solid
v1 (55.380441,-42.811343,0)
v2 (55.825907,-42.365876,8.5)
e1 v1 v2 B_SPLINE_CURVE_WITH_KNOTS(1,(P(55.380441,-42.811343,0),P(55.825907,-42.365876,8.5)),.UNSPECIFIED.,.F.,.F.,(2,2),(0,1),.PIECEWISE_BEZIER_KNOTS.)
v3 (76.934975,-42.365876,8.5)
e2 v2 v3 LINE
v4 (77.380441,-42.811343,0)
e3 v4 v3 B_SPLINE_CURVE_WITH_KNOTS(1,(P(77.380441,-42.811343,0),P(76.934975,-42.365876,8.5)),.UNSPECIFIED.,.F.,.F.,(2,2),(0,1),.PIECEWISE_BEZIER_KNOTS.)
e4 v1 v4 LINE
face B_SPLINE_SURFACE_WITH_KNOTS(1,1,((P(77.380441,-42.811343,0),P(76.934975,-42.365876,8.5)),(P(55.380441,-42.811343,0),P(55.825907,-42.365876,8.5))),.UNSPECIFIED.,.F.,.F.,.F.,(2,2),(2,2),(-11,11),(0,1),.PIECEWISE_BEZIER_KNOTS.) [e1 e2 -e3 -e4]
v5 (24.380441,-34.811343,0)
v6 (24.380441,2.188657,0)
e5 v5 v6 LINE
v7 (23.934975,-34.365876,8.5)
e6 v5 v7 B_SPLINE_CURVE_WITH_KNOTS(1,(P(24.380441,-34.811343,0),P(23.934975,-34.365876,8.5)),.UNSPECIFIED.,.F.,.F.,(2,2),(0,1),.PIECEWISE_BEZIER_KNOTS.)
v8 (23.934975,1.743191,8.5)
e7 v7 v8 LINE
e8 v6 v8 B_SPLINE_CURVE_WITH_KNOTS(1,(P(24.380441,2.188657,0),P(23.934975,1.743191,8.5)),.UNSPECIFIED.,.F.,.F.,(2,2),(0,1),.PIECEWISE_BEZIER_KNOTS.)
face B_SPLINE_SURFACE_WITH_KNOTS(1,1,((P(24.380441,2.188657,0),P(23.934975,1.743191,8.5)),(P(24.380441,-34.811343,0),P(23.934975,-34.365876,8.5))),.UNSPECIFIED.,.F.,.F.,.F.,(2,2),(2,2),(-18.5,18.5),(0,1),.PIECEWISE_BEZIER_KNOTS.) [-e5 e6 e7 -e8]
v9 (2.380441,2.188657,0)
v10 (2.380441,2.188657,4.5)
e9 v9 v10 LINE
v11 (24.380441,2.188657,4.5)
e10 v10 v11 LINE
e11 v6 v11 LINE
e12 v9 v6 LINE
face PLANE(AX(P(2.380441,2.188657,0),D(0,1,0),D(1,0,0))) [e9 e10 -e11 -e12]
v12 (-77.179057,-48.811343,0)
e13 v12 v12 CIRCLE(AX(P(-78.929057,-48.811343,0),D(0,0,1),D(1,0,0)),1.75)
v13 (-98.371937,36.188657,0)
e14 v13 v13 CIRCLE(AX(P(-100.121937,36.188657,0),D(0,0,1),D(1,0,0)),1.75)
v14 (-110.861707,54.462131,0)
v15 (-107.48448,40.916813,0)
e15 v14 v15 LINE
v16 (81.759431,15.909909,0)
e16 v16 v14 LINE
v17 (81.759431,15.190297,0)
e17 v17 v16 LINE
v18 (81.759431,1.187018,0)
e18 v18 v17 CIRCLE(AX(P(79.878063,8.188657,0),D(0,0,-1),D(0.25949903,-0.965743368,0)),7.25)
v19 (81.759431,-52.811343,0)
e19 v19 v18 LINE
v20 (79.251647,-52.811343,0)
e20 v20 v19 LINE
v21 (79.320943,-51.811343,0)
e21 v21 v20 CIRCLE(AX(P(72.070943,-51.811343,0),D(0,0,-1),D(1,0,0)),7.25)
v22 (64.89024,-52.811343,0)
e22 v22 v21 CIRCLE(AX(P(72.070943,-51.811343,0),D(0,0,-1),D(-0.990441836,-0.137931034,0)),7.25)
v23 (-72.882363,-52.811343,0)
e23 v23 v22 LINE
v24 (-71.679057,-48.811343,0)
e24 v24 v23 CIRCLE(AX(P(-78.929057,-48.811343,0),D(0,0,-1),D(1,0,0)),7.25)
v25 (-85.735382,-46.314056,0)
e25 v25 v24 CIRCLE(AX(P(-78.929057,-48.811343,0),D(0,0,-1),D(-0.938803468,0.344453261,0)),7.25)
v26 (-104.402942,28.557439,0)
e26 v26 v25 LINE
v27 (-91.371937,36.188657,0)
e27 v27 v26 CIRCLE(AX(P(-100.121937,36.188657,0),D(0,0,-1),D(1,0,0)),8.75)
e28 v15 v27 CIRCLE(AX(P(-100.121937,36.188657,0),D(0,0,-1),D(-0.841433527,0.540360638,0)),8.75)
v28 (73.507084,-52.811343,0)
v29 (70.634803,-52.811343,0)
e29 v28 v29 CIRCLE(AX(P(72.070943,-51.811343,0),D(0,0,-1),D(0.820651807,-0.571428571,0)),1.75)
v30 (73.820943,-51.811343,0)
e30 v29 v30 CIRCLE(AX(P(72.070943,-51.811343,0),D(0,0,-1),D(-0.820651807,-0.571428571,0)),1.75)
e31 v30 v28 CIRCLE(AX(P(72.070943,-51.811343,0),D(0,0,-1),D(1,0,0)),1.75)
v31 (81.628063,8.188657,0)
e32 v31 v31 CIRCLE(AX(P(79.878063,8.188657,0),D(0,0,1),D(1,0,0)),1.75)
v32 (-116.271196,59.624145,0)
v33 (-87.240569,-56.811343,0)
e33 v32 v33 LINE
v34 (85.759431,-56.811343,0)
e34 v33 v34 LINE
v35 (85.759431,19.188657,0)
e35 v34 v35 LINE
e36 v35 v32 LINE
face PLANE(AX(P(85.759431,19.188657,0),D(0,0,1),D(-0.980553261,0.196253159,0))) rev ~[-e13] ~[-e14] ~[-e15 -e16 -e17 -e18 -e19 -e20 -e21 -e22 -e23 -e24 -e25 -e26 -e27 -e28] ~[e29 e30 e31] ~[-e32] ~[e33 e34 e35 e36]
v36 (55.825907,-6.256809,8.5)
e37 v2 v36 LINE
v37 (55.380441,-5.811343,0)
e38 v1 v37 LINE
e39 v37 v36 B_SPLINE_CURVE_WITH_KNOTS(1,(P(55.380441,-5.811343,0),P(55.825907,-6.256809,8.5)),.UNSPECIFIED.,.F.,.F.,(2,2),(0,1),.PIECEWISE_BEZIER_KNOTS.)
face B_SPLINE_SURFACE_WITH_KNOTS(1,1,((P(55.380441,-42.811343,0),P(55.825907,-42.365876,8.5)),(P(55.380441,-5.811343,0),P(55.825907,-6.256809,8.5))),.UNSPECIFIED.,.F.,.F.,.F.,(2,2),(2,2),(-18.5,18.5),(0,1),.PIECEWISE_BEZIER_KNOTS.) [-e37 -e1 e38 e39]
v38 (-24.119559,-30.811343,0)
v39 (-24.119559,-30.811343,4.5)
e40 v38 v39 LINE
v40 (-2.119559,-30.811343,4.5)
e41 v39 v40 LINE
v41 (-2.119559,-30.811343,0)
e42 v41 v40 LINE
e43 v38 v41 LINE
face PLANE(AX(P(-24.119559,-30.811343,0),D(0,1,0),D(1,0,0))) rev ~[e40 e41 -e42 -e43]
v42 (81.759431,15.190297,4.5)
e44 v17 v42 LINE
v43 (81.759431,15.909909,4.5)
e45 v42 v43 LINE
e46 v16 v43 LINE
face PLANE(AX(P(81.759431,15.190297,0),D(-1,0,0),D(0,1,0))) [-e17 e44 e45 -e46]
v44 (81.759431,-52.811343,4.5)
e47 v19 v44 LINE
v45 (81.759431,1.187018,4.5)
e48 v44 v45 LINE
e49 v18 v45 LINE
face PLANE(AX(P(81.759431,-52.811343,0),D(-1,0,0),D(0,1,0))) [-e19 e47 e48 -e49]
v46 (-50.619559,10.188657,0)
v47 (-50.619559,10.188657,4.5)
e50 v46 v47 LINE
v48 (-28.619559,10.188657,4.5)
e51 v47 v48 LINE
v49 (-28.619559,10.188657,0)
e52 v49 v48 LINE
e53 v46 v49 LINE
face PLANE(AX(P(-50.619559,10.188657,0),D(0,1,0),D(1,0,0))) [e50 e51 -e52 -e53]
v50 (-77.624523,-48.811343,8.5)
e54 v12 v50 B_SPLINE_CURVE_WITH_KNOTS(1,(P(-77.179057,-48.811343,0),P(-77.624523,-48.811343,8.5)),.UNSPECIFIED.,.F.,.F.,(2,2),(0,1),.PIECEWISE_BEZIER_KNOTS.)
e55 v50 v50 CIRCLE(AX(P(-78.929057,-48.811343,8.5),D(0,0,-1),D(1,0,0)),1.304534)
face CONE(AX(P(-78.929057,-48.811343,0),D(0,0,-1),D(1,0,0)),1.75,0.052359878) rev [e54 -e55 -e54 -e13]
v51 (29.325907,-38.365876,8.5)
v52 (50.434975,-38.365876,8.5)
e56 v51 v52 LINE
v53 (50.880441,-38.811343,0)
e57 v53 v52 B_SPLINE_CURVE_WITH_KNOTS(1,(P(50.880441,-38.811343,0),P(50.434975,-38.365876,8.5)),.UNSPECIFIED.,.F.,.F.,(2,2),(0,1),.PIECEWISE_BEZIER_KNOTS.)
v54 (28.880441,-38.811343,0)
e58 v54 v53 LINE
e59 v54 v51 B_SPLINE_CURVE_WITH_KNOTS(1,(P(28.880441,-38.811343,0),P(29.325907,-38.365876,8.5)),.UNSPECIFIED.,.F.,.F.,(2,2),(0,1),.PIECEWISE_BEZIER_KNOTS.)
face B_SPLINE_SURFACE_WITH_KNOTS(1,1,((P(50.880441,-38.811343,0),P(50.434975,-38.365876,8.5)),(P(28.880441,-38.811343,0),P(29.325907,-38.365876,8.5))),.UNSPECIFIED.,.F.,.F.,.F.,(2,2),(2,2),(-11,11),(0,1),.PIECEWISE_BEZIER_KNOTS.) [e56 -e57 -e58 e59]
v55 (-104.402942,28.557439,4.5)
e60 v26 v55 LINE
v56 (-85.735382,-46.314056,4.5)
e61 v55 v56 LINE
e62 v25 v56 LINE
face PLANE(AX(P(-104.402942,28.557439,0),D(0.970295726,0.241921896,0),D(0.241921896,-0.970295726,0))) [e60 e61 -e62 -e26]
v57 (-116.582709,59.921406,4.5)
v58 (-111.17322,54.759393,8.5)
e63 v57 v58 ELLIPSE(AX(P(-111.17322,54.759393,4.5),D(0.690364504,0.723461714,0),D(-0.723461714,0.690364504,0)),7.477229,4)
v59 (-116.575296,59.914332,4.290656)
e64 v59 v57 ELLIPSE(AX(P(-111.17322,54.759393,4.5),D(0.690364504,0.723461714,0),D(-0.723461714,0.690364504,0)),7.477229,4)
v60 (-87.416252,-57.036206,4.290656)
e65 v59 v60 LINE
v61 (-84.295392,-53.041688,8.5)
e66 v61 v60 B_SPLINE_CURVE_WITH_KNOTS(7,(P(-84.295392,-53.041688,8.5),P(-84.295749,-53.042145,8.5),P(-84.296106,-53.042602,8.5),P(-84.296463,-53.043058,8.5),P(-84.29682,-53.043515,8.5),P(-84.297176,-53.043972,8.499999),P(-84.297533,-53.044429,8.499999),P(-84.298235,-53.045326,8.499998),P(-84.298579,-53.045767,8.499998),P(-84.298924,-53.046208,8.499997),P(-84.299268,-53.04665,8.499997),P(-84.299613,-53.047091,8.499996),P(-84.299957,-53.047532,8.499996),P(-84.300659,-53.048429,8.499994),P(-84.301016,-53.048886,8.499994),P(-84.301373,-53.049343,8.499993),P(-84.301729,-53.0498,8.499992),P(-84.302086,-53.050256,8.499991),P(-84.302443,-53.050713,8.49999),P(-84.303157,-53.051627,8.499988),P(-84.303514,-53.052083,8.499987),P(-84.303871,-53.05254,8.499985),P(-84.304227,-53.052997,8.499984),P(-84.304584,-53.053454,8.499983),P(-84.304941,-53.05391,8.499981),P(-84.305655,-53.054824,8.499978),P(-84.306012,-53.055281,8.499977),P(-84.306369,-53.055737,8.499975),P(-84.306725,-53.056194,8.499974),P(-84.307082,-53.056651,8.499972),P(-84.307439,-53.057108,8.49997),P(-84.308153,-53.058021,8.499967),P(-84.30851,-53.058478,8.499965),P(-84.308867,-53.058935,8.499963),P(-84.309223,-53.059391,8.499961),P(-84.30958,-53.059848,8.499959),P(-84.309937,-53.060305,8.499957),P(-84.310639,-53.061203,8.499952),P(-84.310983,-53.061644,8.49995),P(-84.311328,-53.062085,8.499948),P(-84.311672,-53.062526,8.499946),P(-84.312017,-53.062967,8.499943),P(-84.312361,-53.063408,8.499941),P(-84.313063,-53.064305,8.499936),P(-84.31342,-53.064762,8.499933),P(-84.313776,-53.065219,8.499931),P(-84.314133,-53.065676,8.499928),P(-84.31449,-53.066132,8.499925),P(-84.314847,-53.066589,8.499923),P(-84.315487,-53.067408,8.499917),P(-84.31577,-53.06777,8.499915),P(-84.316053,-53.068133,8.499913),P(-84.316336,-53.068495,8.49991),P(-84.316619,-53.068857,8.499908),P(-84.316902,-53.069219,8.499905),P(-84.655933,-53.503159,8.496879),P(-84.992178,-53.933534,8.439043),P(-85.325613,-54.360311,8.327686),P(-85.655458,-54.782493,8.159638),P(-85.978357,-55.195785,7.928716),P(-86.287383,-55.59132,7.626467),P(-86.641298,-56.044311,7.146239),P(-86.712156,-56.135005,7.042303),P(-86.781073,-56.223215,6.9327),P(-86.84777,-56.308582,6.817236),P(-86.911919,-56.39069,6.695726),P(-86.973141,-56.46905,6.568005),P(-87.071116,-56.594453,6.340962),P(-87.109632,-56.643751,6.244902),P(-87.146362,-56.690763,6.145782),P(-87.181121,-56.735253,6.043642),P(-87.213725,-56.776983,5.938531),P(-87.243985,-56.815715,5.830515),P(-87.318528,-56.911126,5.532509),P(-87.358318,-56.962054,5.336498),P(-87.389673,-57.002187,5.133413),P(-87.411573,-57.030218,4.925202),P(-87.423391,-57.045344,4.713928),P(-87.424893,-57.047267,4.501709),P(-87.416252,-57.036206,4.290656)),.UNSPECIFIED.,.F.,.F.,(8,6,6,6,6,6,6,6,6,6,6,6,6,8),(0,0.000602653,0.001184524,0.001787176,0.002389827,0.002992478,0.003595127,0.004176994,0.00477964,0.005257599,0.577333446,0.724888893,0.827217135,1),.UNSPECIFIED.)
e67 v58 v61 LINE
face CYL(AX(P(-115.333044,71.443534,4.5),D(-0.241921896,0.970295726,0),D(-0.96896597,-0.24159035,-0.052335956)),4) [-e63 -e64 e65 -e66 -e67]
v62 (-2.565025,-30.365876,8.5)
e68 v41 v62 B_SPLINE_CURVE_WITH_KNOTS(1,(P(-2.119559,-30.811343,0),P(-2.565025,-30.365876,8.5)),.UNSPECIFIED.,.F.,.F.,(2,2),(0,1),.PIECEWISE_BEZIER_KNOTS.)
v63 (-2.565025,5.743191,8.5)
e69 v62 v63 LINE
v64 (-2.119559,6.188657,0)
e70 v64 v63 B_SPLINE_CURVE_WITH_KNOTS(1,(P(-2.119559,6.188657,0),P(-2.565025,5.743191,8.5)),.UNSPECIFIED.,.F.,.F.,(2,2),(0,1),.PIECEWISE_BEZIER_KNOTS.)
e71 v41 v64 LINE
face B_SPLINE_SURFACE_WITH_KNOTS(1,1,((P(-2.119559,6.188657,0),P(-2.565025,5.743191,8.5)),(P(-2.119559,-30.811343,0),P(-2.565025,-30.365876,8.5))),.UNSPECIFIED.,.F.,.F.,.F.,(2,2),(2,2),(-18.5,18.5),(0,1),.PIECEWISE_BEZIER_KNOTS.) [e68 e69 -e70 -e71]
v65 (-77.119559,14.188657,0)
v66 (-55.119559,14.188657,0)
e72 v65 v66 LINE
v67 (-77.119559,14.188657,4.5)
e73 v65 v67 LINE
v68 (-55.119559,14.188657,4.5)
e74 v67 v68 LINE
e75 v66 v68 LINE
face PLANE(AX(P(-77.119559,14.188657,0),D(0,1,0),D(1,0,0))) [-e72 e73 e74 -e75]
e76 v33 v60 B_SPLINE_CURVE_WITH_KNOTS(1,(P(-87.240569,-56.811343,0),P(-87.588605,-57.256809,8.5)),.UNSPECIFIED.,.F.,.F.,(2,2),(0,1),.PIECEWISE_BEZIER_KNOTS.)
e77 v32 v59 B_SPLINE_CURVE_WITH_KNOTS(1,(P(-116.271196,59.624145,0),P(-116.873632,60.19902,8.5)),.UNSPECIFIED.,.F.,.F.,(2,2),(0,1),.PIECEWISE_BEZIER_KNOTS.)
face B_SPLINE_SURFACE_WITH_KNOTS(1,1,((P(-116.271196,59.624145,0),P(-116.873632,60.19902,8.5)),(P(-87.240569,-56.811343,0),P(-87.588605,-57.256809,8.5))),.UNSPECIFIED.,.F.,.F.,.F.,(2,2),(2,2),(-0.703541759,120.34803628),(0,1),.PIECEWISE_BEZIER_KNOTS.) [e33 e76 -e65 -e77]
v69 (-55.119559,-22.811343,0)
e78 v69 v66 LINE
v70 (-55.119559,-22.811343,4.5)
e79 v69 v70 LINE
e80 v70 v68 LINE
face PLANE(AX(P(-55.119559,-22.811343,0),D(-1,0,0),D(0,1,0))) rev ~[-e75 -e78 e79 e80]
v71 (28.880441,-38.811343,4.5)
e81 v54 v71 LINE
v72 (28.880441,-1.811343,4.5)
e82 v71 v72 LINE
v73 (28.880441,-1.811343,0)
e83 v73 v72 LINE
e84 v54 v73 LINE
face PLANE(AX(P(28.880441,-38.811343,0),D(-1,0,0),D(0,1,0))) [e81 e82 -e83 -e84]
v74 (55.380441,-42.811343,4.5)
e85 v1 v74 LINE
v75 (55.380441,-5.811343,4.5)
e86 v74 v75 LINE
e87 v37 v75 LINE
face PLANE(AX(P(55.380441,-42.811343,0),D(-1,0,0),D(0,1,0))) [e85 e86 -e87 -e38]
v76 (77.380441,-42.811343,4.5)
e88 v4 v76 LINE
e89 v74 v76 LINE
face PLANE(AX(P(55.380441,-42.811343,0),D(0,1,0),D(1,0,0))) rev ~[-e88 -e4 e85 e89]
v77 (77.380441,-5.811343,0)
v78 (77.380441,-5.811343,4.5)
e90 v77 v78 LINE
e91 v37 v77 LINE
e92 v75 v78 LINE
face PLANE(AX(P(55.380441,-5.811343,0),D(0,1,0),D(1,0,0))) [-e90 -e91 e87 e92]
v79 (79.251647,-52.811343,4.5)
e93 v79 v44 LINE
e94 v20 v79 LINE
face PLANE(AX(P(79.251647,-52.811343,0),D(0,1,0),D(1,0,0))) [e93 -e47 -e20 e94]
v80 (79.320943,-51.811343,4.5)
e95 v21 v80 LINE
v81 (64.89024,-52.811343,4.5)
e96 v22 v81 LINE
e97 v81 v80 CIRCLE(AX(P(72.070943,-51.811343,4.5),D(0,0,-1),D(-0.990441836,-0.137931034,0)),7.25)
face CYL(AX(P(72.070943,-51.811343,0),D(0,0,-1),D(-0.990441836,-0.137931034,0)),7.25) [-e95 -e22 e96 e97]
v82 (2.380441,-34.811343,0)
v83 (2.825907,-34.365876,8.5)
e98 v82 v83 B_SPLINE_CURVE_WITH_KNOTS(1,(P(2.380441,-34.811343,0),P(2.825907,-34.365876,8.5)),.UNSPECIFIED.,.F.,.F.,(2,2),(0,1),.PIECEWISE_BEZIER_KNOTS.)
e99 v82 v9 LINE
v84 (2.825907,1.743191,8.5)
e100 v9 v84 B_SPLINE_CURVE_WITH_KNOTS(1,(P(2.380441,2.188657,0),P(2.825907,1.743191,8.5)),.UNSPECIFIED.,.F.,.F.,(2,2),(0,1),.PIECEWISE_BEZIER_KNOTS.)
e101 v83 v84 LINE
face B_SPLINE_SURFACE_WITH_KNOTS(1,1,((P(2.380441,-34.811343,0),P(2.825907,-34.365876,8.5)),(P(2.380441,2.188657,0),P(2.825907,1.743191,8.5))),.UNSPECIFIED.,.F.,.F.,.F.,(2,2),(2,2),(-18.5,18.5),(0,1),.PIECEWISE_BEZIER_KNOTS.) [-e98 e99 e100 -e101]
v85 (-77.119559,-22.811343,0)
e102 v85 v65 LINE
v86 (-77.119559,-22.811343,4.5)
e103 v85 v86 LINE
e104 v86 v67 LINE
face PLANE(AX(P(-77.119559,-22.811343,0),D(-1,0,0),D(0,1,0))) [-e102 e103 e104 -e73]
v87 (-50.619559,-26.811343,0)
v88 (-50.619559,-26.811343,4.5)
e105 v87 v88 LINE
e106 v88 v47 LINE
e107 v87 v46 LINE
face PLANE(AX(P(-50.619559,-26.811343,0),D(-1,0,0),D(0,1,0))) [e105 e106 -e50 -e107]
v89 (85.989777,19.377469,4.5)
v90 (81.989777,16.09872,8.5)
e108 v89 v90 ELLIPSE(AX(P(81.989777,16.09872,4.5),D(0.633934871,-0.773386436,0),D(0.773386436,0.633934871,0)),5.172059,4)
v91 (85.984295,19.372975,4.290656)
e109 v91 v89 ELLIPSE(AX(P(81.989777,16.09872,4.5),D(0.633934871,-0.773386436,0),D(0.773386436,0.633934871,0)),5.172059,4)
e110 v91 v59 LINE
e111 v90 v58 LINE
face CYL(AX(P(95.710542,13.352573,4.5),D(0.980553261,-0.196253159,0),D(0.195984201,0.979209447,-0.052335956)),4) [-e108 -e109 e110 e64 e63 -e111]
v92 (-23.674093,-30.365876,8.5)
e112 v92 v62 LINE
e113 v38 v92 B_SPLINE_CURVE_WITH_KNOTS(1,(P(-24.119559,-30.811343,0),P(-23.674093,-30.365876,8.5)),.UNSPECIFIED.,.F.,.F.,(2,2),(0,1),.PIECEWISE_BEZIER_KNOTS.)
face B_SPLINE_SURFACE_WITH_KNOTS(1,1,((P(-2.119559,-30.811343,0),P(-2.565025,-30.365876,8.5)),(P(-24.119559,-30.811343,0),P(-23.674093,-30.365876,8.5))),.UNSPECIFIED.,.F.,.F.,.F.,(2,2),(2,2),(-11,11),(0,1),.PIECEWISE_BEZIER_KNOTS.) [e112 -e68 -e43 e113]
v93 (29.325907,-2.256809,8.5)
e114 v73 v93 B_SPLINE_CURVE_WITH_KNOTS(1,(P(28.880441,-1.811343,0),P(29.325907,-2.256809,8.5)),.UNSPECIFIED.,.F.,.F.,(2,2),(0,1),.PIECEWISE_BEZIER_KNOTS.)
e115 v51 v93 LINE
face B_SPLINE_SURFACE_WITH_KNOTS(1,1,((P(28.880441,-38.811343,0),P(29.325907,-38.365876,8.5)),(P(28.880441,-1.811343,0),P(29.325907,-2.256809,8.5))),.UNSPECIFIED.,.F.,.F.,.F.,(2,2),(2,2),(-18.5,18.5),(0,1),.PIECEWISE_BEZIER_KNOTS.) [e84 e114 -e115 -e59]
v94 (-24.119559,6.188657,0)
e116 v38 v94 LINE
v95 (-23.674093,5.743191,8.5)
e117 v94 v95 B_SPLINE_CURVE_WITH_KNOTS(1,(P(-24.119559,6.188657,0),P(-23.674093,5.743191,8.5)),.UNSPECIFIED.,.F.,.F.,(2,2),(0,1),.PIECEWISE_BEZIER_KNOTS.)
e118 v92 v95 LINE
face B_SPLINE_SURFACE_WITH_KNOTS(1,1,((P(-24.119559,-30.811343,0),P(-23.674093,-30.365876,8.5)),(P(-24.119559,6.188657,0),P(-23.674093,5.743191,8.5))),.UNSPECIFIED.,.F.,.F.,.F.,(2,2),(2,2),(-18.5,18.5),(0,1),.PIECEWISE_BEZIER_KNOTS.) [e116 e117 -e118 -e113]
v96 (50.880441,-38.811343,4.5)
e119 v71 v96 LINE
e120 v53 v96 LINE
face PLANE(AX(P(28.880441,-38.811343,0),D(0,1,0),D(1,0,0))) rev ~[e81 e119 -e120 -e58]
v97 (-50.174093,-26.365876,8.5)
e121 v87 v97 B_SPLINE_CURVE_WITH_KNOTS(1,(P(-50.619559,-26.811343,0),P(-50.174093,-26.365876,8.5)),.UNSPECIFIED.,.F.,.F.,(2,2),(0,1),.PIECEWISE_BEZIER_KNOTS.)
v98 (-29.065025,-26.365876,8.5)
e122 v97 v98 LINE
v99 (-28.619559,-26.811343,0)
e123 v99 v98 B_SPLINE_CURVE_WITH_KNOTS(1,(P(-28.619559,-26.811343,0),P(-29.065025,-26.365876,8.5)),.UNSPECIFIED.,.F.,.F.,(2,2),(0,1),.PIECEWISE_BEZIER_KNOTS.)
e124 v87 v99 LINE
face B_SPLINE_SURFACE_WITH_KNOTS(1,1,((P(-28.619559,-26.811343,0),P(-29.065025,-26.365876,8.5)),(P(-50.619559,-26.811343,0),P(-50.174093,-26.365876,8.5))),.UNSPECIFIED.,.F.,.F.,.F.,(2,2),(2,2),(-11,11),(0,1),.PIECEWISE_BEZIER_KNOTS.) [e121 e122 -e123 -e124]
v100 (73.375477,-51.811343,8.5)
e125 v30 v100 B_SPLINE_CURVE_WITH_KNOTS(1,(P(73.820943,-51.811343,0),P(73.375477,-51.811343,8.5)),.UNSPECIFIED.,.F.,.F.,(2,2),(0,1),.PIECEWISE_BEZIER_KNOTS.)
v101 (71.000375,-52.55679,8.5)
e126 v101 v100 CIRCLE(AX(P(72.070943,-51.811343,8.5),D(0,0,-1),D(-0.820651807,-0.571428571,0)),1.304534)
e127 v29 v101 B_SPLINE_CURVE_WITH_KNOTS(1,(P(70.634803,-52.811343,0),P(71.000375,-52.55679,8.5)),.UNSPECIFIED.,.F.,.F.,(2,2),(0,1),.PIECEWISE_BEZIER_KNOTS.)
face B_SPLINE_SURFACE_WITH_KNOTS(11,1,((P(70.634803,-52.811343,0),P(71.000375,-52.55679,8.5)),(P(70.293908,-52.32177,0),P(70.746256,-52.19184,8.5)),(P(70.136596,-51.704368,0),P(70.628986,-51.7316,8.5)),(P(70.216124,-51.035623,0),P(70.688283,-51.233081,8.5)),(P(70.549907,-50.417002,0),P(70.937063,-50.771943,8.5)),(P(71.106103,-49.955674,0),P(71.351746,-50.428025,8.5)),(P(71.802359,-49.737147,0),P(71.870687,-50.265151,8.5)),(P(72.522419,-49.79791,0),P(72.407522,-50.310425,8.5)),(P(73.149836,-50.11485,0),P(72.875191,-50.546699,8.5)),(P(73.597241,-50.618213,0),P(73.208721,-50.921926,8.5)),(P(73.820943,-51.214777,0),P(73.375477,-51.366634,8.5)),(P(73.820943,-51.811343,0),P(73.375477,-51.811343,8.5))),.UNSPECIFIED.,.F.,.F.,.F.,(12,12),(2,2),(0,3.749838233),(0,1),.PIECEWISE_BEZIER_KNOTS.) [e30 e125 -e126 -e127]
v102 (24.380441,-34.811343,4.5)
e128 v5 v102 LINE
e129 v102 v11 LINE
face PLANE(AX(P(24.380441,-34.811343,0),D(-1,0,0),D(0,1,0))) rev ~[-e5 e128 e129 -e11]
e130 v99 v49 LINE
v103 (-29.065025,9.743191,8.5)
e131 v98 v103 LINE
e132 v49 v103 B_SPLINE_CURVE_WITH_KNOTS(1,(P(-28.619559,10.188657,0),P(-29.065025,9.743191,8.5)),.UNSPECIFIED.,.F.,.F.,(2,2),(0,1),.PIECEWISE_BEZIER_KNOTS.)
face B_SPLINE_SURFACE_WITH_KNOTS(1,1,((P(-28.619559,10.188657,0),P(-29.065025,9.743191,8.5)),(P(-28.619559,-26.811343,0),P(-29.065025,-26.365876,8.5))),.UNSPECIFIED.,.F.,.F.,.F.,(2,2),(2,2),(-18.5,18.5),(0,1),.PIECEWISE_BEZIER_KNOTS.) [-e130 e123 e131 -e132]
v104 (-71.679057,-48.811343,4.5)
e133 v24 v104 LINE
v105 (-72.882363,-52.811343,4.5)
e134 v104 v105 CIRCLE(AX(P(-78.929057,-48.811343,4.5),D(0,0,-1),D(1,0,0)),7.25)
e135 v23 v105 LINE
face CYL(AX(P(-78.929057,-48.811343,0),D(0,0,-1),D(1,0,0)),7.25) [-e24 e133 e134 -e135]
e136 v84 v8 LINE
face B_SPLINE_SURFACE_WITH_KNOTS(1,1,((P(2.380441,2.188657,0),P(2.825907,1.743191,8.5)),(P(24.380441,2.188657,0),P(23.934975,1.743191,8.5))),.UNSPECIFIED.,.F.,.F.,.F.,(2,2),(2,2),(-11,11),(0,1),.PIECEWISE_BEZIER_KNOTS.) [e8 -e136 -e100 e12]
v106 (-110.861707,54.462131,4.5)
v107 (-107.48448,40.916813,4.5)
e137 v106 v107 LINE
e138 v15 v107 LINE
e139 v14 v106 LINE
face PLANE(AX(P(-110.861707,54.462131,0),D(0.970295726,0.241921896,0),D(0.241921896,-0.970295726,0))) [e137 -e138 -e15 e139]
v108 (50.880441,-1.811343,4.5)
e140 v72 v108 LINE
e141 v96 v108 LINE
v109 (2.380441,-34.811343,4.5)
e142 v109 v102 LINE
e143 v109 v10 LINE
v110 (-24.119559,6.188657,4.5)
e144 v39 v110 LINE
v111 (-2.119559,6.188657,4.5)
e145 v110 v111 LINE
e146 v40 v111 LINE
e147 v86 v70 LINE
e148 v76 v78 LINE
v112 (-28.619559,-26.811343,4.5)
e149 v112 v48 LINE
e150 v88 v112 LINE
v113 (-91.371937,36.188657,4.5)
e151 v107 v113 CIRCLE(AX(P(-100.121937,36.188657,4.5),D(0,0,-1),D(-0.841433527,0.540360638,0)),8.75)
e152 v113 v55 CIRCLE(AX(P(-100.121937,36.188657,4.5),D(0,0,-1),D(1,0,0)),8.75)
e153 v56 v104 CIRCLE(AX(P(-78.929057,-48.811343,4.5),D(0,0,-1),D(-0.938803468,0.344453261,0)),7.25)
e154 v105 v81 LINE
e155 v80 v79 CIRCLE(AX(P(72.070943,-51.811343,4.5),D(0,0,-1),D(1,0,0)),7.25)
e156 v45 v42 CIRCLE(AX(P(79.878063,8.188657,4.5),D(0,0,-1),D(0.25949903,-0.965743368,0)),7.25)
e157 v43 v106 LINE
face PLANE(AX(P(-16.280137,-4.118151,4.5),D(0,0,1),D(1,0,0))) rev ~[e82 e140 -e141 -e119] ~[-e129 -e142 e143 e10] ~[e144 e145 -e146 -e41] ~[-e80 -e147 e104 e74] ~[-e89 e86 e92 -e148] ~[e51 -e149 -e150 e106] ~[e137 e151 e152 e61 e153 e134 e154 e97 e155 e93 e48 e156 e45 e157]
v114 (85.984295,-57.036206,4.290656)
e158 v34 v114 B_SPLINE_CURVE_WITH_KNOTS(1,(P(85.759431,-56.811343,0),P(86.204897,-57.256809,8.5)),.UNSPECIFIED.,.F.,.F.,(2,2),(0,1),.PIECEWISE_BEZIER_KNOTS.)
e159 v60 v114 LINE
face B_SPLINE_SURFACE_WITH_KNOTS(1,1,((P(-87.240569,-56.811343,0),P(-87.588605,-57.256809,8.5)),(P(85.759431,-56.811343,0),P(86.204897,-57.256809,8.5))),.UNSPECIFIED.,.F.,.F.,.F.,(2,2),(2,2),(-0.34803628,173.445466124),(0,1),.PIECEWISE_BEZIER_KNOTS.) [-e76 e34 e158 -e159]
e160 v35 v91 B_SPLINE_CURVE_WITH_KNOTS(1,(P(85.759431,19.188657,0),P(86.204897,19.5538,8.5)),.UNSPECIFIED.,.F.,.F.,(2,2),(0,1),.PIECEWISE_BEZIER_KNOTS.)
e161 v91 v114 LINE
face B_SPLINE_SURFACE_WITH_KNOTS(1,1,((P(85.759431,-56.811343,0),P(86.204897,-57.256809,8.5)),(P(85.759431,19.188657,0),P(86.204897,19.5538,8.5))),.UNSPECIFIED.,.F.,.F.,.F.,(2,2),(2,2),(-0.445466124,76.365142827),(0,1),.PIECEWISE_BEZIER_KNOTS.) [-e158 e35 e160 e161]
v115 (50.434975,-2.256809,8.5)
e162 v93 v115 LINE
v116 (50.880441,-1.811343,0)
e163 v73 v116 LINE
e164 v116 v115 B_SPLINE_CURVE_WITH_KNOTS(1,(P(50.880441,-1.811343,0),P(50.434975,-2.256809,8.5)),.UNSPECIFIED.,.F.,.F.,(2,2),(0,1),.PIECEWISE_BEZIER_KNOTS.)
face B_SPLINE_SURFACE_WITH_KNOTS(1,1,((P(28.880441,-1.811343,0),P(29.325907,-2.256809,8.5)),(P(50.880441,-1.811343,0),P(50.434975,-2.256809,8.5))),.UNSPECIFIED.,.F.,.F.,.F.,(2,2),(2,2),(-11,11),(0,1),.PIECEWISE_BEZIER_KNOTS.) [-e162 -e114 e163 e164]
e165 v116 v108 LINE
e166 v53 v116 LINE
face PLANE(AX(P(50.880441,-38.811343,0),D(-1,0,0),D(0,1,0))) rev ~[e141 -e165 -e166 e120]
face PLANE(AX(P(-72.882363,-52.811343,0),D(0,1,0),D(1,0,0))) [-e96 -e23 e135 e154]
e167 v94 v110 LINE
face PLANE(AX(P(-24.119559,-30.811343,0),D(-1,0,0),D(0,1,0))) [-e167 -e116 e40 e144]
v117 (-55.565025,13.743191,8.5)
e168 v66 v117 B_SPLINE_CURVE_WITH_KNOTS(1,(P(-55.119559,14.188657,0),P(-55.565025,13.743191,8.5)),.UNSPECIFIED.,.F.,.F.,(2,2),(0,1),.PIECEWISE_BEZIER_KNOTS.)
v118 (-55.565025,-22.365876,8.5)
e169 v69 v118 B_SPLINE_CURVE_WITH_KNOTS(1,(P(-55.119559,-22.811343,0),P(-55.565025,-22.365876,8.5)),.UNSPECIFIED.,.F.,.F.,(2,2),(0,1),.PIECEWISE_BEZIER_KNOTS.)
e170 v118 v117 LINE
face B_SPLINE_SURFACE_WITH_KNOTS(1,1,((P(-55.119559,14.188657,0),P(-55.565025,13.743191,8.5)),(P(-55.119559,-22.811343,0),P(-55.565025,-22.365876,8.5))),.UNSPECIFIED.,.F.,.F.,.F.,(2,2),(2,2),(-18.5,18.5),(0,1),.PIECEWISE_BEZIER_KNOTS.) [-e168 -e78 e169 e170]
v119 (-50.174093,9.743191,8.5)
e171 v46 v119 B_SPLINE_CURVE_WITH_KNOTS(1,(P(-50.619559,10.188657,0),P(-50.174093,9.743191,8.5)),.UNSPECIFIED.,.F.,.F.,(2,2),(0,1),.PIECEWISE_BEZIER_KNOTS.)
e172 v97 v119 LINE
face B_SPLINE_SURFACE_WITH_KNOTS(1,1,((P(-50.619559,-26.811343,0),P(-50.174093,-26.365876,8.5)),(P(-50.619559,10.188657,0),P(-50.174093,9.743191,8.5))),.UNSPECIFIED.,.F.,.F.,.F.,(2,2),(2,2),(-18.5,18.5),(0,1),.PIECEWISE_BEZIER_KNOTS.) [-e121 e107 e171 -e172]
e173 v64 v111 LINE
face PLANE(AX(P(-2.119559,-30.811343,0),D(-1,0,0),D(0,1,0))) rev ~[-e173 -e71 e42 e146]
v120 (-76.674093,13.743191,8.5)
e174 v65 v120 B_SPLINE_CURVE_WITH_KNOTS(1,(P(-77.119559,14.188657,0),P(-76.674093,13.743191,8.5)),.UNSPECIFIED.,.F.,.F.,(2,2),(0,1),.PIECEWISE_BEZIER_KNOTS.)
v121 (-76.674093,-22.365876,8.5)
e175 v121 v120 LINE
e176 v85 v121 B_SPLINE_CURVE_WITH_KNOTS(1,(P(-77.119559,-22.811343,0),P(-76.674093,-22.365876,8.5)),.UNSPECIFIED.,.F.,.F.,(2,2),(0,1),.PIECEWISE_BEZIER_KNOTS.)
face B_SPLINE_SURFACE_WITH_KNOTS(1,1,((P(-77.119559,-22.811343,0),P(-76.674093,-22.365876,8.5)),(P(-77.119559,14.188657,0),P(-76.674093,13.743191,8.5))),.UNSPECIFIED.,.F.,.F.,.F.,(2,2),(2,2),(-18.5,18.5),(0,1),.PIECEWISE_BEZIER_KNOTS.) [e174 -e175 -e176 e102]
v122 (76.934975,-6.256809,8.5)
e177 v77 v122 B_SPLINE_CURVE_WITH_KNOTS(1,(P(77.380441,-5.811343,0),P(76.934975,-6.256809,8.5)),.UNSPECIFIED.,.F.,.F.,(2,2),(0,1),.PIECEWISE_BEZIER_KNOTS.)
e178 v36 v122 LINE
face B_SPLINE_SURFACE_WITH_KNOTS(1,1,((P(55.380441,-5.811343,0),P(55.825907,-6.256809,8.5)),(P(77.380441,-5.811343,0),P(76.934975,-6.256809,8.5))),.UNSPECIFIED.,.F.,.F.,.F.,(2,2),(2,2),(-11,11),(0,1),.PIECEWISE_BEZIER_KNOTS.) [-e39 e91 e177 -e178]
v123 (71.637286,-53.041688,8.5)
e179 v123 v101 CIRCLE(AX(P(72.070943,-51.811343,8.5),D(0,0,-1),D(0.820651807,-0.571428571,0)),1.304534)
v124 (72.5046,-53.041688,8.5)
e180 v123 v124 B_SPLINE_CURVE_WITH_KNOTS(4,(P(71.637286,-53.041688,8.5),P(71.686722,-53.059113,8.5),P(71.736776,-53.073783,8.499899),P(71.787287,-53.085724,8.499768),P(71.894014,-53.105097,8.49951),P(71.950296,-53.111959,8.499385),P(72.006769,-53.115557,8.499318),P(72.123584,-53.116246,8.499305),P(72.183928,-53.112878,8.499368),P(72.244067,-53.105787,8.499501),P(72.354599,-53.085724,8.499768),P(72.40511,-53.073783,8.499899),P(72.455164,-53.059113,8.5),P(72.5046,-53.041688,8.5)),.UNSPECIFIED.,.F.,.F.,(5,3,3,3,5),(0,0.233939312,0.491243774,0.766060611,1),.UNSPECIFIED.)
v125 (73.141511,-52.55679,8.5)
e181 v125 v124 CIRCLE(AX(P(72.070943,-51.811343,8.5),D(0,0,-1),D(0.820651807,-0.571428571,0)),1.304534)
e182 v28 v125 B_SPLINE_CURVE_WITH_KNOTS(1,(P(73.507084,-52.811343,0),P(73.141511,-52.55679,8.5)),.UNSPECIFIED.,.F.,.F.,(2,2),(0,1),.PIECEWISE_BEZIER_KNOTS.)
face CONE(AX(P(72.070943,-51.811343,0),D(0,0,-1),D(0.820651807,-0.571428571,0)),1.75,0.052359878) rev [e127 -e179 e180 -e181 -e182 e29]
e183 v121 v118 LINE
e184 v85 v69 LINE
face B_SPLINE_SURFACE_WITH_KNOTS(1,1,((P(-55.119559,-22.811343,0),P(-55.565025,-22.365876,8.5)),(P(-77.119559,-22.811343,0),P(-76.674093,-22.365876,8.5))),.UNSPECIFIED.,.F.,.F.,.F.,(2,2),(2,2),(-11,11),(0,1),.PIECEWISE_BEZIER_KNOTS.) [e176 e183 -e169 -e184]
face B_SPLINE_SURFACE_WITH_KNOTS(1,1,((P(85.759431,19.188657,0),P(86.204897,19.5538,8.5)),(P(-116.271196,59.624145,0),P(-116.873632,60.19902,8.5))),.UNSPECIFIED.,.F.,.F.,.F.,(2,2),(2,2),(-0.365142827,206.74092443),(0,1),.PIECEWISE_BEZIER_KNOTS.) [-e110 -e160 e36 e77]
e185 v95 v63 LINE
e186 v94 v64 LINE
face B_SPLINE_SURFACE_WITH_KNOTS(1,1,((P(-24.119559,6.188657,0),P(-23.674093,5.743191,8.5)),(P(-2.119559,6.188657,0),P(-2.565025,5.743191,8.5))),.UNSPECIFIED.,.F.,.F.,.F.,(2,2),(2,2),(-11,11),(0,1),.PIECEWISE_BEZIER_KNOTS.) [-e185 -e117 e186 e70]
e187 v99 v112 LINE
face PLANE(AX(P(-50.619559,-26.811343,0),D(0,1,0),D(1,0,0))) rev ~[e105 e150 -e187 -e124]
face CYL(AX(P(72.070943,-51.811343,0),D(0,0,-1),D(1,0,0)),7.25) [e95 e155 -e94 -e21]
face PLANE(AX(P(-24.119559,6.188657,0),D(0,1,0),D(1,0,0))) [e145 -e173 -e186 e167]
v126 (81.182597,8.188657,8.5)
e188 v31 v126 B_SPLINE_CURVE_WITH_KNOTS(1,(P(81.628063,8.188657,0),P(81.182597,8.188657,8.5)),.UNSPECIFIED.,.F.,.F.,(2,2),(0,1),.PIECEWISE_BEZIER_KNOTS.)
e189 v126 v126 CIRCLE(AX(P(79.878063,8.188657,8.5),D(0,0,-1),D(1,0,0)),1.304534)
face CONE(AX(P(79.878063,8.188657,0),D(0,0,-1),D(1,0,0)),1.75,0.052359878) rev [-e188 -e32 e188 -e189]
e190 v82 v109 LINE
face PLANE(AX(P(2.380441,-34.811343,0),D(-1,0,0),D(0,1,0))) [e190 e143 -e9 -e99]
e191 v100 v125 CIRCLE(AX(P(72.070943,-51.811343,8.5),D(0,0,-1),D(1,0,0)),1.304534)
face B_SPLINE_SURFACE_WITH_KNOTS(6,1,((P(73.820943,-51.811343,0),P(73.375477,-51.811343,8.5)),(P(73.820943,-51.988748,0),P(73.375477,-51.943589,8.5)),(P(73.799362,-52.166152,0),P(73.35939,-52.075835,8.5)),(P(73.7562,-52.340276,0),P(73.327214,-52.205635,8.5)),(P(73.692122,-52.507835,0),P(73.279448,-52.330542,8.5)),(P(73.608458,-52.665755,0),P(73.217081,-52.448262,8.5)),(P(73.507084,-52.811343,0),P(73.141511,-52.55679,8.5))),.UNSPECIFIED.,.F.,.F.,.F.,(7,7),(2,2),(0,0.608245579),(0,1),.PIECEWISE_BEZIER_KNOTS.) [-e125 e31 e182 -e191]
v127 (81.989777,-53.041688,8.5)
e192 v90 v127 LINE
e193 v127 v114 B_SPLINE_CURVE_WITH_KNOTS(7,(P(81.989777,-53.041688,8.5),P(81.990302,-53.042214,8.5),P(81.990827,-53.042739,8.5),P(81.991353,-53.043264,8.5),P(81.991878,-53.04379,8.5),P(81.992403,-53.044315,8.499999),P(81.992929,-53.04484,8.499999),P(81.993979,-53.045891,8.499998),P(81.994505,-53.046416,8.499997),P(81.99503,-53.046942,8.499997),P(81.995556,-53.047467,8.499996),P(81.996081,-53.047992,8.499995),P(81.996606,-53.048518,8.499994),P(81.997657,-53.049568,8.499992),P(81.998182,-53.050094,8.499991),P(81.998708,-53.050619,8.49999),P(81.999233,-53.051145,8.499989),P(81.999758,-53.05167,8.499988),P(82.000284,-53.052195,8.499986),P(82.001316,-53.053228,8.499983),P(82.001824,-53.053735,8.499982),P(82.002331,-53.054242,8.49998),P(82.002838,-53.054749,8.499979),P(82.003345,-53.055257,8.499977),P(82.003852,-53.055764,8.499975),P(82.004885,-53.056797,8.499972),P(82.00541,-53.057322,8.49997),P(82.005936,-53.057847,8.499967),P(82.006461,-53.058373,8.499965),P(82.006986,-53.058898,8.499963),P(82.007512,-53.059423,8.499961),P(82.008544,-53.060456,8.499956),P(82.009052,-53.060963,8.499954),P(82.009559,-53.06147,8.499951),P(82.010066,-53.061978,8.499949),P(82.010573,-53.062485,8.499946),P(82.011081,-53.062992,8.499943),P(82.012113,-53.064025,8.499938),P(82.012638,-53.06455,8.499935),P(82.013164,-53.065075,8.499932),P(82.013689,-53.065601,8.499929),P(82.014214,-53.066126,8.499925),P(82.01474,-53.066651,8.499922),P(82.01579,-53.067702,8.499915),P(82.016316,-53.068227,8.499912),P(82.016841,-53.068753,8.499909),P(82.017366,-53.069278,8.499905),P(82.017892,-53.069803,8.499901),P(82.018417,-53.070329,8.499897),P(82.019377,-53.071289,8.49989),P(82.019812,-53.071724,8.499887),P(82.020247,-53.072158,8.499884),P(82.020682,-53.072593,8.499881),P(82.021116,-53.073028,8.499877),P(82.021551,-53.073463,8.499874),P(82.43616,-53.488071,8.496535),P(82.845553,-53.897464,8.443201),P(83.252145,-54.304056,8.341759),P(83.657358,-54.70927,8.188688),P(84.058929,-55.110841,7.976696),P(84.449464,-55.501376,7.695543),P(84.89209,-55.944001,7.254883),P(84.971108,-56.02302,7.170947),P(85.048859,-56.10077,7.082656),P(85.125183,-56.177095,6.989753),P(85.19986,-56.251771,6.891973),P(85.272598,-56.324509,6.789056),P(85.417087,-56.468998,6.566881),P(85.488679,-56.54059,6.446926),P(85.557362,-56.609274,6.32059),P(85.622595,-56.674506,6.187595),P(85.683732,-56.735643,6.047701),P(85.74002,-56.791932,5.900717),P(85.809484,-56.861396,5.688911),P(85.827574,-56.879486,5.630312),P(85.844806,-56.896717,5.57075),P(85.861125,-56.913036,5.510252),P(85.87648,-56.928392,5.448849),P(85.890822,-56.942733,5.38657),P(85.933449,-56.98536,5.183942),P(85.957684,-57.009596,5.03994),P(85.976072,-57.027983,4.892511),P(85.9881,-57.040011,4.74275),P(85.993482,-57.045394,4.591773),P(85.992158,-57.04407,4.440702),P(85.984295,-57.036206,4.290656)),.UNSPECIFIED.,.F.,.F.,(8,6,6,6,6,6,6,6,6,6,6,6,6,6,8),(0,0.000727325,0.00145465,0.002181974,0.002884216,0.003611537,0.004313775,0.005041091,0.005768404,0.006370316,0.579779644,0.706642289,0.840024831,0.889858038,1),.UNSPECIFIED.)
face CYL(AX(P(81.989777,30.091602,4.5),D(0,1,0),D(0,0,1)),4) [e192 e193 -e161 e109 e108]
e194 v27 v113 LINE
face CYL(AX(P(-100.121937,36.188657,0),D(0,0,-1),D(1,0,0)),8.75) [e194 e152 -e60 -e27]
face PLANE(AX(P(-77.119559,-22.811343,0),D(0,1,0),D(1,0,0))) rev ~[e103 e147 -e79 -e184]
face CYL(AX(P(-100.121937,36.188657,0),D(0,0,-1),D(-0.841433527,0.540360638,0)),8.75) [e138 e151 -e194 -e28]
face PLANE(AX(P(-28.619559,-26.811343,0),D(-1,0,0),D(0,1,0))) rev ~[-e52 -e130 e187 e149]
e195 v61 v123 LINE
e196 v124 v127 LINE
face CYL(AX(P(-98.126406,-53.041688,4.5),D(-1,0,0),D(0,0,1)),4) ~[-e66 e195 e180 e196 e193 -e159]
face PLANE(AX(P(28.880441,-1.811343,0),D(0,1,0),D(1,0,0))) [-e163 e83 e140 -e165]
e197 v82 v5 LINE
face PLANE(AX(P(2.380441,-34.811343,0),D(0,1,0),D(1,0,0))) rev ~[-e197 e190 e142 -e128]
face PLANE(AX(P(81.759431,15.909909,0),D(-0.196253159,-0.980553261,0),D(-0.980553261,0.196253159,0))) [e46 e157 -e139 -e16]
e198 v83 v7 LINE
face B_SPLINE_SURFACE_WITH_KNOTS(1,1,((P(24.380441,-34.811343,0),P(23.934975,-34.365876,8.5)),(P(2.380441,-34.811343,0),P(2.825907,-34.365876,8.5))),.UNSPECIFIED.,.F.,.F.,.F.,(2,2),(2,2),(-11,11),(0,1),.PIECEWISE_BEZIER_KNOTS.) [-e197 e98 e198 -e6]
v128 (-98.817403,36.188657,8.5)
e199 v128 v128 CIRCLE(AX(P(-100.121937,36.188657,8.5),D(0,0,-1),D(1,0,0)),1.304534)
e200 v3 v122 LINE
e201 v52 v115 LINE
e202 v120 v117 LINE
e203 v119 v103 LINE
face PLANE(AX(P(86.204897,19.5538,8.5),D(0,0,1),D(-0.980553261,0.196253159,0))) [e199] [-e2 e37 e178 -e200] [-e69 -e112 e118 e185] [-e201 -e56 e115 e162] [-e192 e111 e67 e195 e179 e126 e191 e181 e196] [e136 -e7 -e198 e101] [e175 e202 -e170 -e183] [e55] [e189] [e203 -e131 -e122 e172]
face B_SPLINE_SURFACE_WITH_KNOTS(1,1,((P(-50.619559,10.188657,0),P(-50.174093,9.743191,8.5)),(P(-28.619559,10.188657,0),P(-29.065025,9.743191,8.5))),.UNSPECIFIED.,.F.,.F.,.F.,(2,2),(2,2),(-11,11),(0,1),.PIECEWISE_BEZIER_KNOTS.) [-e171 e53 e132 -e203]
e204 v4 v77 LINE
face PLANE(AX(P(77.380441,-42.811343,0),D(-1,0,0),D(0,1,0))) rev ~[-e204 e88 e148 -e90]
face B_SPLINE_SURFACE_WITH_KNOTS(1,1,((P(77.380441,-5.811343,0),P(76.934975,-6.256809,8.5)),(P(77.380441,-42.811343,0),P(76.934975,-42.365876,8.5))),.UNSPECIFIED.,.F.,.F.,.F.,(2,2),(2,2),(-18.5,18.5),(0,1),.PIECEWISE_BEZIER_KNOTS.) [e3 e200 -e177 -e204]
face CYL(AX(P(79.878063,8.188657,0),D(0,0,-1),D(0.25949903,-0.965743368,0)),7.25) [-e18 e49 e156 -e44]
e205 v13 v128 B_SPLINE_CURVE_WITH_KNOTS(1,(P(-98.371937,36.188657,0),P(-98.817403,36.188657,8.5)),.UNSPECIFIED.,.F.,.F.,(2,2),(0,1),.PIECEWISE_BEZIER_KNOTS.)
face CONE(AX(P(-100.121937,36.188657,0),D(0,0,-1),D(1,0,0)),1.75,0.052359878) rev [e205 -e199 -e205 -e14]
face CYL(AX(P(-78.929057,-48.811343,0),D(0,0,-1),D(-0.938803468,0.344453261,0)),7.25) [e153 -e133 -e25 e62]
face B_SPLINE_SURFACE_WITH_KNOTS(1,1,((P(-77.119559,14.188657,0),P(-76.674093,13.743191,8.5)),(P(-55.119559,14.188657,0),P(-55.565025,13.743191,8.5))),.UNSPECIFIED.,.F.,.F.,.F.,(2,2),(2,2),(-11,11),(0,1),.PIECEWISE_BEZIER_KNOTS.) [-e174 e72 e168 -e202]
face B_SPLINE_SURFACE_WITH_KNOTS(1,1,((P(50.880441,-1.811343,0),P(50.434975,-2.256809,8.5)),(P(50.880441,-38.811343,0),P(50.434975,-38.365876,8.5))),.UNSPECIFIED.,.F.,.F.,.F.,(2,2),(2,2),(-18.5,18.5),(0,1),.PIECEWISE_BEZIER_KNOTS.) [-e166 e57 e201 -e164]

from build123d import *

# Parameters (mm, degrees)
F0_R        = 1.75
F0_W        = 22
F0_H        = 37
F1_DEPTH    = 8.5
F1_TAPER    = -3
F2_DEPTH    = 4.5
F3_T1_DEPTH = 142.1271805444
F3_T3_DEPTH = 228.1816697632
F3_T5_DEPTH = 194.8691049092
F3_T7_DEPTH = 97.8862114568


# Not quite as in the source:
# - a fillet or chamfer that OpenCascade refuses, or shapes differently, is made with other operations: its cross-section is extruded or revolved along the edge and cut away or added


with BuildPart() as f1:
    # F0 (on Top) → F1 (new body)
    with BuildSketch(Plane.XY):
        with BuildLine():
            ThreePointArc((-85.7353818111, -46.3140564233), (-82.1998275149, -55.281625252), (-72.882363358, -52.811342563))
            Line((-72.882363358, -52.811342563), (-84.115426434, -52.811342563))
            Line((-84.115426434, -52.811342563), (-85.7353818111, -46.3140564233))
        make_face()
        with BuildLine():
            Line((-84.115426434, -52.811342563), (-72.882363358, -52.811342563))
            ThreePointArc((-72.882363358, -52.811342563), (-71.9863977223, -50.8998795502), (-71.6790566692, -48.811342563))
            ThreePointArc((-71.6790566692, -48.811342563), (-77.6608605642, -41.6731229923), (-85.7353818111, -46.3140564233))
            Line((-85.7353818111, -46.3140564233), (-84.115426434, -52.811342563))
        make_face()
        with Locations((-78.9290566692, -48.811342563)):
            Circle(F0_R, mode=Mode.SUBTRACT)
        with BuildLine():
            ThreePointArc((73.5070839924, -52.811342563), (72.0709433308, -53.561342563), (70.6348026691, -52.811342563))
            Line((70.6348026691, -52.811342563), (64.8902400226, -52.811342563))
            ThreePointArc((64.8902400226, -52.811342563), (65.5417323383, -54.9628348787), (66.8209433308, -56.811342563))
            Line((66.8209433308, -56.811342563), (77.3209433308, -56.811342563))
            ThreePointArc((77.3209433308, -56.811342563), (78.6001543232, -54.9628348787), (79.2516466389, -52.811342563))
            Line((79.2516466389, -52.811342563), (73.5070839924, -52.811342563))
        make_face()
        with BuildLine():
            ThreePointArc((70.6348026691, -52.811342563), (71.5468947442, -50.1416500527), (73.8209433308, -51.811342563))
            ThreePointArc((73.8209433308, -51.811342563), (73.7406358411, -52.3353911496), (73.5070839924, -52.811342563))
            Line((73.5070839924, -52.811342563), (79.2516466389, -52.811342563))
            ThreePointArc((79.2516466389, -52.811342563), (79.3035984098, -52.3125416331), (79.3209433308, -51.811342563))
            ThreePointArc((79.3209433308, -51.811342563), (71.5697442607, -44.578687484), (64.8902400226, -52.811342563))
            Line((64.8902400226, -52.811342563), (70.6348026691, -52.811342563))
        make_face()
        with BuildLine():
            ThreePointArc((81.75943106, 15.1902968563), (72.6280630891, 8.188657437), (81.75943106, 1.1870180177))
            Line((81.75943106, 1.1870180177), (81.75943106, 15.1902968563))
        make_face()
        with Locations((79.8780630891, 8.188657437)):
            Circle(F0_R, mode=Mode.SUBTRACT)
        with BuildLine():
            Line((81.75943106, 15.1902968563), (81.75943106, 1.1870180177))
            ThreePointArc((81.75943106, 1.1870180177), (83.9978435057, 2.2229295418), (85.75943106, 3.9493165931))
            Line((85.75943106, 3.9493165931), (85.75943106, 12.4279982809))
            ThreePointArc((85.75943106, 12.4279982809), (83.9978435057, 14.1543853322), (81.75943106, 15.1902968563))
        make_face()
        with BuildLine():
            Line((-107.4844802754, 40.9168130189), (-104.4029422618, 28.5574391079))
            ThreePointArc((-104.4029422618, 28.5574391079), (-95.700189339, 28.6381178265), (-91.3719369109, 36.188657437))
            ThreePointArc((-91.3719369109, 36.188657437), (-97.6581749945, 44.5846313066), (-107.4844802754, 40.9168130189))
        make_face()
        with Locations((-100.1219369109, 36.188657437)):
            Circle(F0_R, mode=Mode.SUBTRACT)
        with BuildLine():
            ThreePointArc((-107.4844802754, 40.9168130189), (-108.6120245158, 34.0718408505), (-104.4029422618, 28.5574391079))
            Line((-104.4029422618, 28.5574391079), (-107.4844802754, 40.9168130189))
        make_face()
        with BuildLine():
            ThreePointArc((66.8209433308, -56.811342563), (65.5417323383, -54.9628348787), (64.8902400226, -52.811342563))
            Line((64.8902400226, -52.811342563), (-72.882363358, -52.811342563))
            ThreePointArc((-72.882363358, -52.811342563), (-82.1998275149, -55.281625252), (-85.7353818111, -46.3140564233))
            Line((-85.7353818111, -46.3140564233), (-104.4029422618, 28.5574391079))
            ThreePointArc((-104.4029422618, 28.5574391079), (-108.6120245158, 34.0718408505), (-107.4844802754, 40.9168130189))
            Line((-107.4844802754, 40.9168130189), (-110.8617073408, 54.4621309411))
            Line((-110.8617073408, 54.4621309411), (81.75943106, 15.9099091088))
            Line((81.75943106, 15.9099091088), (81.75943106, 15.1902968563))
            ThreePointArc((81.75943106, 15.1902968563), (83.9978435057, 14.1543853322), (85.75943106, 12.4279982809))
            Line((85.75943106, 12.4279982809), (85.75943106, 19.188657437))
            Line((85.75943106, 19.188657437), (-116.2711964119, 59.6241445901))
            Line((-116.2711964119, 59.6241445901), (-87.24056894, -56.811342563))
            Line((-87.24056894, -56.811342563), (66.8209433308, -56.811342563))
        make_face()
        with BuildLine():
            Line((81.75943106, -52.811342563), (79.2516466389, -52.811342563))
            ThreePointArc((79.2516466389, -52.811342563), (78.6001543232, -54.9628348787), (77.3209433308, -56.811342563))
            Line((77.3209433308, -56.811342563), (85.75943106, -56.811342563))
            Line((85.75943106, -56.811342563), (85.75943106, 3.9493165931))
            ThreePointArc((85.75943106, 3.9493165931), (83.9978435057, 2.2229295418), (81.75943106, 1.1870180177))
            Line((81.75943106, 1.1870180177), (81.75943106, -52.811342563))
        make_face()
        with BuildLine():
            Line((-72.882363358, -52.811342563), (64.8902400226, -52.811342563))
            ThreePointArc((64.8902400226, -52.811342563), (71.5697442607, -44.578687484), (79.3209433308, -51.811342563))
            ThreePointArc((79.3209433308, -51.811342563), (79.3035984098, -52.3125416331), (79.2516466389, -52.811342563))
            Line((79.2516466389, -52.811342563), (81.75943106, -52.811342563))
            Line((81.75943106, -52.811342563), (81.75943106, 1.1870180177))
            ThreePointArc((81.75943106, 1.1870180177), (72.6280630891, 8.188657437), (81.75943106, 15.1902968563))
            Line((81.75943106, 15.1902968563), (81.75943106, 15.9099091088))
            Line((81.75943106, 15.9099091088), (-110.8617073408, 54.4621309411))
            Line((-110.8617073408, 54.4621309411), (-107.4844802754, 40.9168130189))
            ThreePointArc((-107.4844802754, 40.9168130189), (-97.6581749945, 44.5846313066), (-91.3719369109, 36.188657437))
            ThreePointArc((-91.3719369109, 36.188657437), (-95.700189339, 28.6381178265), (-104.4029422618, 28.5574391079))
            Line((-104.4029422618, 28.5574391079), (-85.7353818111, -46.3140564233))
            ThreePointArc((-85.7353818111, -46.3140564233), (-77.6608605642, -41.6731229923), (-71.6790566692, -48.811342563))
            ThreePointArc((-71.6790566692, -48.811342563), (-71.9863977223, -50.8998795502), (-72.882363358, -52.811342563))
        make_face()
        with Locations((-66.1195590496, -4.311342563)):
            Rectangle(F0_W, F0_H, mode=Mode.SUBTRACT)
        with Locations((-39.6195590496, -8.311342563)):
            Rectangle(F0_W, F0_H, mode=Mode.SUBTRACT)
        with Locations((13.3804409504, -16.311342563)):
            Rectangle(F0_W, F0_H, mode=Mode.SUBTRACT)
        with Locations((-13.1195590496, -12.311342563)):
            Rectangle(F0_W, F0_H, mode=Mode.SUBTRACT)
        with Locations((39.8804409504, -20.311342563)):
            Rectangle(F0_W, F0_H, mode=Mode.SUBTRACT)
        with Locations((66.3804409504, -24.311342563)):
            Rectangle(F0_W, F0_H, mode=Mode.SUBTRACT)
    extrude(amount=F1_DEPTH, taper=F1_TAPER)

    # F0 (on Top) → F2 (cut)
    with BuildSketch(Plane.XY):
        with BuildLine():
            Line((-72.882363358, -52.811342563), (64.8902400226, -52.811342563))
            ThreePointArc((64.8902400226, -52.811342563), (71.5697442607, -44.578687484), (79.3209433308, -51.811342563))
            ThreePointArc((79.3209433308, -51.811342563), (79.3035984098, -52.3125416331), (79.2516466389, -52.811342563))
            Line((79.2516466389, -52.811342563), (81.75943106, -52.811342563))
            Line((81.75943106, -52.811342563), (81.75943106, 1.1870180177))
            ThreePointArc((81.75943106, 1.1870180177), (72.6280630891, 8.188657437), (81.75943106, 15.1902968563))
            Line((81.75943106, 15.1902968563), (81.75943106, 15.9099091088))
            Line((81.75943106, 15.9099091088), (-110.8617073408, 54.4621309411))
            Line((-110.8617073408, 54.4621309411), (-107.4844802754, 40.9168130189))
            ThreePointArc((-107.4844802754, 40.9168130189), (-97.6581749945, 44.5846313066), (-91.3719369109, 36.188657437))
            ThreePointArc((-91.3719369109, 36.188657437), (-95.700189339, 28.6381178265), (-104.4029422618, 28.5574391079))
            Line((-104.4029422618, 28.5574391079), (-85.7353818111, -46.3140564233))
            ThreePointArc((-85.7353818111, -46.3140564233), (-77.6608605642, -41.6731229923), (-71.6790566692, -48.811342563))
            ThreePointArc((-71.6790566692, -48.811342563), (-71.9863977223, -50.8998795502), (-72.882363358, -52.811342563))
        make_face()
        with Locations((-66.1195590496, -4.311342563)):
            Rectangle(F0_W, F0_H, mode=Mode.SUBTRACT)
        with Locations((-39.6195590496, -8.311342563)):
            Rectangle(F0_W, F0_H, mode=Mode.SUBTRACT)
        with Locations((13.3804409504, -16.311342563)):
            Rectangle(F0_W, F0_H, mode=Mode.SUBTRACT)
        with Locations((-13.1195590496, -12.311342563)):
            Rectangle(F0_W, F0_H, mode=Mode.SUBTRACT)
        with Locations((39.8804409504, -20.311342563)):
            Rectangle(F0_W, F0_H, mode=Mode.SUBTRACT)
        with Locations((66.3804409504, -24.311342563)):
            Rectangle(F0_W, F0_H, mode=Mode.SUBTRACT)
    extrude(amount=F2_DEPTH, mode=Mode.SUBTRACT)

    # F3: fillet of radius 4 on 4 edges, made by hand

    # F3_s2 → F3_t1 (cut)
    with BuildSketch(Plane(origin=(-23.5203588914, 94.3350069914, 0), x_dir=(0, 0, 1), z_dir=(0.2419218956, -0.9702957263, 0))):
        with BuildLine():
            ThreePointArc((4.290656175, 98.6179226466), (7.2534183028, 97.5249019916), (8.5, 94.6234045075))
            Line((8.5, 94.6234045075), (8.5, 98.8385250087))
            Line((8.5, 98.8385250087), (4.290656175, 98.6179226466))
        make_face()
    extrude(amount=F3_T1_DEPTH, mode=Mode.SUBTRACT)

    # F3_s4 → F3_t3 (cut)
    with BuildSketch(Plane(origin=(89.4546965917, -17.9039400119, 0), x_dir=(0, 0, 1), z_dir=(-0.980553261, 0.1962531587, 0))):
        with BuildLine():
            ThreePointArc((4.290656175, 35.8709236176), (7.2534183028, 34.7779029626), (8.5, 31.8764054785))
            Line((8.5, 31.8764054785), (8.5, 36.0915259797))
            Line((8.5, 36.0915259797), (4.290656175, 35.8709236176))
        make_face()
    extrude(amount=F3_T3_DEPTH, mode=Mode.SUBTRACT)

    # F3_s6 → F3_t5 (cut)
    with BuildSketch(Plane.YZ.offset(-98.1264064725)):
        with BuildLine():
            ThreePointArc((-53.0416881858, 8.5), (-55.9431856699, 7.2534183028), (-57.0362063248, 4.290656175))
            Line((-57.0362063248, 4.290656175), (-57.2568086869, 8.5))
            Line((-57.2568086869, 8.5), (-53.0416881858, 8.5))
        make_face()
    extrude(amount=F3_T5_DEPTH, mode=Mode.SUBTRACT)

    # F3_s8 → F3_t7 (cut)
    with BuildSketch(Plane.XZ.offset(-30.091601517)):
        with BuildLine():
            ThreePointArc((81.9897766828, 8.5), (84.8912741668, 7.2534183028), (85.9842948218, 4.290656175))
            Line((85.9842948218, 4.290656175), (86.2048971839, 8.5))
            Line((86.2048971839, 8.5), (81.9897766828, 8.5))
        make_face()
    extrude(amount=F3_T7_DEPTH, mode=Mode.SUBTRACT)


solid = f1.part
